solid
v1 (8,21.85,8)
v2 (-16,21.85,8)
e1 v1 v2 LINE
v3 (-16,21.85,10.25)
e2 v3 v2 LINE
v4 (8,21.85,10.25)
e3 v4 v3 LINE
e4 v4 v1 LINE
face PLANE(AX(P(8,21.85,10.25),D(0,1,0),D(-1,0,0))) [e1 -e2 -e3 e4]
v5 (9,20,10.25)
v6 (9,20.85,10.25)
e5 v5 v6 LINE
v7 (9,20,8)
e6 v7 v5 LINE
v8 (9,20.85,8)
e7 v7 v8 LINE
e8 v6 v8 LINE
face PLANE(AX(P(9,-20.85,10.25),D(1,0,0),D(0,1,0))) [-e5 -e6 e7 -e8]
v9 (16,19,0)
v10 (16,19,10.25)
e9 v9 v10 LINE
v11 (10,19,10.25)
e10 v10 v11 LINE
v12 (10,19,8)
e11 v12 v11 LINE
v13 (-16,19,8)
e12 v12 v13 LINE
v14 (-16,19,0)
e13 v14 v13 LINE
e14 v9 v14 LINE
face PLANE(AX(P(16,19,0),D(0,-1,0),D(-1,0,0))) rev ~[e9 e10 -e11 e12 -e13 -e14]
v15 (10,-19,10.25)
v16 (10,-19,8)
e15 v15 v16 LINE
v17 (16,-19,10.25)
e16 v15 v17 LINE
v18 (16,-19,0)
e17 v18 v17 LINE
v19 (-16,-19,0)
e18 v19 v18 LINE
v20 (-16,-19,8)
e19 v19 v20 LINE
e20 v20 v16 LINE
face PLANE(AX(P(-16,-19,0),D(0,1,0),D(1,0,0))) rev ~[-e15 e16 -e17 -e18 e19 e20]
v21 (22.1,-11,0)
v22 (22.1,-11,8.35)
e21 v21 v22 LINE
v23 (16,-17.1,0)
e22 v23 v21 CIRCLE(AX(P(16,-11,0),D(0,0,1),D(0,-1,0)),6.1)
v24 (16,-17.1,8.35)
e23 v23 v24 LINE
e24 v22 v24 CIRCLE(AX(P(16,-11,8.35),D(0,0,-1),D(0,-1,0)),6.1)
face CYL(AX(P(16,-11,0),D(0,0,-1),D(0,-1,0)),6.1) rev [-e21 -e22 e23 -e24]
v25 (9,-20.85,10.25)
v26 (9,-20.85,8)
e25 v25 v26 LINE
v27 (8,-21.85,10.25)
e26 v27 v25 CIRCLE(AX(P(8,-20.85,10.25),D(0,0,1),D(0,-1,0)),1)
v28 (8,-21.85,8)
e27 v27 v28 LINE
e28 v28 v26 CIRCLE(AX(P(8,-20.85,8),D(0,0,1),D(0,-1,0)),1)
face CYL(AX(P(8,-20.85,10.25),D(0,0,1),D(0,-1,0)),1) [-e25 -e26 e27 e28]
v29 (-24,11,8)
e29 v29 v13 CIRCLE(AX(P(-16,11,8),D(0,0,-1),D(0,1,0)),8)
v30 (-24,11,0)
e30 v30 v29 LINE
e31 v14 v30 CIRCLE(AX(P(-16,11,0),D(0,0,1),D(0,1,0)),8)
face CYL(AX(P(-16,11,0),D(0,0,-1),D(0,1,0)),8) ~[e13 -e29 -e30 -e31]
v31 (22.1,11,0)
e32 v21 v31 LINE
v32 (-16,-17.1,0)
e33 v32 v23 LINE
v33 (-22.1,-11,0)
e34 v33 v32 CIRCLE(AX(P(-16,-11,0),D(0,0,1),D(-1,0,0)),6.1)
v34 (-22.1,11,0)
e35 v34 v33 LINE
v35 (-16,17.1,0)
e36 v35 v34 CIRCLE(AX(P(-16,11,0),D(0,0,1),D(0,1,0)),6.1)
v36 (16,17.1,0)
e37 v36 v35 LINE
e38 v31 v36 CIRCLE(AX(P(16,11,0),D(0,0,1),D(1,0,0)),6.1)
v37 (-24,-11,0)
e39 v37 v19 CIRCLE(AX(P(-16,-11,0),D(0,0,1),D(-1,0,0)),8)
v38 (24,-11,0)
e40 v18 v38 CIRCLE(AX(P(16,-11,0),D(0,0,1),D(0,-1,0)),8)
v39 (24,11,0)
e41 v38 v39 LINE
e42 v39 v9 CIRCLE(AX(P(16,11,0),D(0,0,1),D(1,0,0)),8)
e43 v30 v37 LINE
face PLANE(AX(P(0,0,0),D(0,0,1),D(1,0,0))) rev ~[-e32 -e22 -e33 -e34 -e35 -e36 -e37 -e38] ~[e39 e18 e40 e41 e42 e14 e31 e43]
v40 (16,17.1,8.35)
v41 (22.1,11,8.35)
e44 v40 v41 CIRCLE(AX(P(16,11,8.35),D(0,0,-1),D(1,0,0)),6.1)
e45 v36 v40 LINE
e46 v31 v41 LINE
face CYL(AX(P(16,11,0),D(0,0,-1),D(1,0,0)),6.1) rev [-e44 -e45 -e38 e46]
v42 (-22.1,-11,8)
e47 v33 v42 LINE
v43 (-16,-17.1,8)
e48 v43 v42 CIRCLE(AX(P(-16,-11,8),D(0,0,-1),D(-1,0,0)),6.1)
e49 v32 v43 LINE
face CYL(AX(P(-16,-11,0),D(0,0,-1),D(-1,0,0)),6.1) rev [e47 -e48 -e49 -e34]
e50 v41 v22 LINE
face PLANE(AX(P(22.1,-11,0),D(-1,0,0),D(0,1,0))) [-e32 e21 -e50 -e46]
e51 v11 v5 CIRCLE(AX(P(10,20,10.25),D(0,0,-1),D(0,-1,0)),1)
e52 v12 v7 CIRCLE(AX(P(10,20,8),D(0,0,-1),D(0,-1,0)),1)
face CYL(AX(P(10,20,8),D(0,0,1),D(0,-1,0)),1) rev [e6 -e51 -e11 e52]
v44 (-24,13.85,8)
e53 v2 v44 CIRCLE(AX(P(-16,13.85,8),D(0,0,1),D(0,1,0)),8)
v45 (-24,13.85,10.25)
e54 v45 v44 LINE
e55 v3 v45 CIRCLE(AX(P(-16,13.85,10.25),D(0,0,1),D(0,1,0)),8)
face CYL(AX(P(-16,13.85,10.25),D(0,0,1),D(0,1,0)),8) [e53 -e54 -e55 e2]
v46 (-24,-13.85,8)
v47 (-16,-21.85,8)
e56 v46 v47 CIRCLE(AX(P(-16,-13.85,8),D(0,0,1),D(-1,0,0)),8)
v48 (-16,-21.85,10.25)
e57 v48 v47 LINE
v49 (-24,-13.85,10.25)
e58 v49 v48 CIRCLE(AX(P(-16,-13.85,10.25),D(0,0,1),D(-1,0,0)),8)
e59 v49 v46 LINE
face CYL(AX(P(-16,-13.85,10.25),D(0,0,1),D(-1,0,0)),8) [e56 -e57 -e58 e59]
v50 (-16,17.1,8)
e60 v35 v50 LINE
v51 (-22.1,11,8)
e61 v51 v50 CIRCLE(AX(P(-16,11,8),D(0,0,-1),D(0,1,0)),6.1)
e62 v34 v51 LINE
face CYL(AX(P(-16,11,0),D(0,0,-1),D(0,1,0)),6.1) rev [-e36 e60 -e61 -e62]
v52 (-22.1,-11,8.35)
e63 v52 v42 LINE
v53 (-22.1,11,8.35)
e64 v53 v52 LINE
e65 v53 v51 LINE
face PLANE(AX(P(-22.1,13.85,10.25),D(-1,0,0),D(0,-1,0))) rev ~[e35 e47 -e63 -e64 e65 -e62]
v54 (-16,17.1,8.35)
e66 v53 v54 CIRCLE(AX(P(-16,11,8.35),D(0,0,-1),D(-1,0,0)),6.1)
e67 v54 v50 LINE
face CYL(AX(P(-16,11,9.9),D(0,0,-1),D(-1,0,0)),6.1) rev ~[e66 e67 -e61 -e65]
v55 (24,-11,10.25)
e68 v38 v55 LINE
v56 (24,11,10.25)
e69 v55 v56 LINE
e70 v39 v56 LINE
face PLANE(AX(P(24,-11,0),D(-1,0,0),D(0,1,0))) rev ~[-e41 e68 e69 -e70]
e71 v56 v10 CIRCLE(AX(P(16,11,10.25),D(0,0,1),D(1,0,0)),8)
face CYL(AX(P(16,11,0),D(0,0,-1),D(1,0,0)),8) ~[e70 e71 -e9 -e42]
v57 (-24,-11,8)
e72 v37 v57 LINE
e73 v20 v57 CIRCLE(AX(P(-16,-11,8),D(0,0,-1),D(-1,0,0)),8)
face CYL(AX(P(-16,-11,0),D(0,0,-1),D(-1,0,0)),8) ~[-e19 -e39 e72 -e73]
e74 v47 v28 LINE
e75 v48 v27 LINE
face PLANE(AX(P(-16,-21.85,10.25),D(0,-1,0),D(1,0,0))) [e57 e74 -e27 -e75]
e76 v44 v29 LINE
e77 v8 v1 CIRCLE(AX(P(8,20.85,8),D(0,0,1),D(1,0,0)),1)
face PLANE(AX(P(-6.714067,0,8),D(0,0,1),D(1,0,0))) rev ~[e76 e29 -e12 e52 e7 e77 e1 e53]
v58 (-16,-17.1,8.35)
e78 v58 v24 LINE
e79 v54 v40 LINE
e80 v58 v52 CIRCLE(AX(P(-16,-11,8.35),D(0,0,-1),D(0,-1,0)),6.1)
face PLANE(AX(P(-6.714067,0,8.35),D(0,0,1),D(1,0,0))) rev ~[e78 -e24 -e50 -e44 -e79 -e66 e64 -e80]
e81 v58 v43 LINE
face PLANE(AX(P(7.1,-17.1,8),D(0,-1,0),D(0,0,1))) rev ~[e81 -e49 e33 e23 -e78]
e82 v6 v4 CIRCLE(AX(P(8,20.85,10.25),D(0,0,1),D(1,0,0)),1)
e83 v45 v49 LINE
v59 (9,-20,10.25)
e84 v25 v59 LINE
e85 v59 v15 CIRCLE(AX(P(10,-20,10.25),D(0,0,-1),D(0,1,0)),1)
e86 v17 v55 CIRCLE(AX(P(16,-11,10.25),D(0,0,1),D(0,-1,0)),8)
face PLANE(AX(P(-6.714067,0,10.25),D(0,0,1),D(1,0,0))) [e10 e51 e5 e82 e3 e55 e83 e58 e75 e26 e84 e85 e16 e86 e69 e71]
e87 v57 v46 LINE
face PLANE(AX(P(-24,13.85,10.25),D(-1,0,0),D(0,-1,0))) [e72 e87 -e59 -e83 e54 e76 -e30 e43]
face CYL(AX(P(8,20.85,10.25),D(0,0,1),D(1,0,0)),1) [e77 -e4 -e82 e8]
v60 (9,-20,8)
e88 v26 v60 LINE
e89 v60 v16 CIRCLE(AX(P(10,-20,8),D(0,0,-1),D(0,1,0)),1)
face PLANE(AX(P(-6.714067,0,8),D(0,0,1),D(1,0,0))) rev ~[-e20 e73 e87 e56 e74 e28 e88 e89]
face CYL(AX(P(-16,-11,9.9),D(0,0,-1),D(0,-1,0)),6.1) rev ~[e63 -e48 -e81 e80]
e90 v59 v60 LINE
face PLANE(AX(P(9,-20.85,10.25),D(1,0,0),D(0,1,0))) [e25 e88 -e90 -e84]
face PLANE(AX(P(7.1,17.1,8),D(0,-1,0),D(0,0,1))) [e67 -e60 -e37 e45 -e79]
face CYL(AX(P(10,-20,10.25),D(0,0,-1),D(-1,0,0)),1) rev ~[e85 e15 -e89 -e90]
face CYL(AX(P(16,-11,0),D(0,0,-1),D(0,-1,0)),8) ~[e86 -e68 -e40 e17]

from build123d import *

# Parameters (mm, degrees)
F1_DEPTH     = 10.25
F3_DEPTH     = 2.25
F4_R         = 1
F5_T         = 1.9
F5_T3_DEPTH  = 4.8
F5_T5_DEPTH  = 28.8
F5_T8_ANGLE  = 90.000000001
F5_T10_ANGLE = 90.000000001


# Not quite as in the source:
# - a shell that OpenCascade refuses in one call is made with other operations: the cavity is built on its own and cut out


with BuildPart() as f1:
    # F0 (on Top) → F1 (new body)
    with BuildSketch(Plane.XY):
        with BuildLine():
            ThreePointArc((24, 11), (21.6568542495, 16.6568542495), (16, 19))
            Line((16, 19), (-16, 19))
            ThreePointArc((-16, 19), (-21.6568542495, 16.6568542495), (-24, 11))
            Line((-24, 11), (-24, -11))
            ThreePointArc((-24, -11), (-21.6568542495, -16.6568542495), (-16, -19))
            Line((-16, -19), (16, -19))
            ThreePointArc((16, -19), (21.6568542495, -16.6568542495), (24, -11))
            Line((24, -11), (24, 11))
        make_face()
    extrude(amount=F1_DEPTH)

    # F2 (on face) → F3 (join)
    with BuildSketch(Plane.XY.offset(10.25)):
        with BuildLine():
            Line((8, 21.85), (-16, 21.85))
            ThreePointArc((-16, 21.85), (-21.6568542495, 19.5068542495), (-24, 13.85))
            Line((-24, 13.85), (-24, -13.85))
            ThreePointArc((-24, -13.85), (-21.6568542495, -19.5068542495), (-16, -21.85))
            Line((-16, -21.85), (8, -21.85))
            ThreePointArc((8, -21.85), (8.7071067812, -21.5571067812), (9, -20.85))
            Line((9, -20.85), (9, 20.85))
            ThreePointArc((9, 20.85), (8.7071067812, 21.5571067812), (8, 21.85))
        make_face()
    extrude(amount=-F3_DEPTH)

    # F4
    f4_edges = [f1.edges().sort_by_distance(p)[0] for p in [
        (9, -19, 9.125),
        (9, 19, 9.125),
    ]]
    fillet(f4_edges, radius=F4_R)

    # F5: shell of thickness 1.9, made by hand


with BuildPart() as f5_core1:
    # F5_t2: copy of F1
    add(f1.part)

    # the walls: a layer under each face that stays
    f5_faces = [f5_core1.faces().sort_by_distance(p)[0] for p in [
        (0, 0, 10.25),
        (0, 19, 5.125),
        (9.2928932188, 19.2928932188, 9.125),
        (21.6568542495, 16.6568542495, 5.125),
        (9, 20.425, 9.125),
        (24, 0, 5.125),
        (21.6568542495, -16.6568542495, 5.125),
        (-4, 21.85, 9.125),
        (0, -19, 5.125),
        (-21.6568542495, 19.5068542495, 9.125),
        (9.2928932188, -19.2928932188, 9.125),
        (-24, 0, 5.125),
        (9, -20.425, 9.125),
        (-21.6568542495, -19.5068542495, 9.125),
        (-4, -21.85, 9.125),
        (-18.3333333333, 20.0416666667, 8),
        (-21.6568542495, 16.6568542495, 4),
        (-18.3333333333, -20.0416666667, 8),
        (-21.6568542495, -16.6568542495, 4),
    ]]
    thicken(f5_faces, amount=-F5_T, mode=Mode.SUBTRACT)

    # F5_s4 → F5_t3 (cut)
    with BuildSketch(Plane.YZ.offset(7.1)):
        Polygon((19.019, 7.981), (17.1, 8), (17.1, 9.9), (19, 9.9), align=None)
        Polygon((-19.019, 7.981), (-17.1, 8), (-17.1, 9.9), (-19, 9.9), align=None)
    extrude(amount=F5_T3_DEPTH, mode=Mode.SUBTRACT)

    # F5_s6 → F5_t5 (cut)
    with BuildSketch(Plane.YZ.offset(-17.9)):
        Polygon((19.019, 7.981), (17.1, 8), (17.1, 9.9), (19, 9.9), align=None)
        Polygon((-19.019, 7.981), (-17.1, 8), (-17.1, 9.9), (-19, 9.9), align=None)
    extrude(amount=F5_T5_DEPTH, mode=Mode.SUBTRACT)

    # F5_s7 → F5_t8 (revolve, cut)
    with BuildSketch(Plane.XZ.offset(-11)):
        Polygon((-24.019, 7.981), (-24, 9.9), (-22.1, 9.9), (-22.1, 8), align=None)
    revolve(axis=Axis((-16, 11, 8), (0, 0, -1)), revolution_arc=F5_T8_ANGLE, mode=Mode.SUBTRACT)

    # F5_s9 → F5_t10 (revolve, cut)
    with BuildSketch(Plane.YZ.offset(-16)):
        Polygon((-19.019, 7.981), (-19, 9.9), (-17.1, 9.9), (-17.1, 8), align=None)
    revolve(axis=Axis((-16, -11, 8), (0, 0, -1)), revolution_arc=F5_T10_ANGLE, mode=Mode.SUBTRACT)


with BuildPart() as f1_1:
    add(f1.part)

    # what is left inside the walls is the cavity
    f5_cavity = [f5_core1.part.solids().sort_by_distance(p)[0] for p in [
        (0, -5.7, 8.331),
    ]]
    add(f5_cavity, mode=Mode.SUBTRACT)


solid = f1_1.part
